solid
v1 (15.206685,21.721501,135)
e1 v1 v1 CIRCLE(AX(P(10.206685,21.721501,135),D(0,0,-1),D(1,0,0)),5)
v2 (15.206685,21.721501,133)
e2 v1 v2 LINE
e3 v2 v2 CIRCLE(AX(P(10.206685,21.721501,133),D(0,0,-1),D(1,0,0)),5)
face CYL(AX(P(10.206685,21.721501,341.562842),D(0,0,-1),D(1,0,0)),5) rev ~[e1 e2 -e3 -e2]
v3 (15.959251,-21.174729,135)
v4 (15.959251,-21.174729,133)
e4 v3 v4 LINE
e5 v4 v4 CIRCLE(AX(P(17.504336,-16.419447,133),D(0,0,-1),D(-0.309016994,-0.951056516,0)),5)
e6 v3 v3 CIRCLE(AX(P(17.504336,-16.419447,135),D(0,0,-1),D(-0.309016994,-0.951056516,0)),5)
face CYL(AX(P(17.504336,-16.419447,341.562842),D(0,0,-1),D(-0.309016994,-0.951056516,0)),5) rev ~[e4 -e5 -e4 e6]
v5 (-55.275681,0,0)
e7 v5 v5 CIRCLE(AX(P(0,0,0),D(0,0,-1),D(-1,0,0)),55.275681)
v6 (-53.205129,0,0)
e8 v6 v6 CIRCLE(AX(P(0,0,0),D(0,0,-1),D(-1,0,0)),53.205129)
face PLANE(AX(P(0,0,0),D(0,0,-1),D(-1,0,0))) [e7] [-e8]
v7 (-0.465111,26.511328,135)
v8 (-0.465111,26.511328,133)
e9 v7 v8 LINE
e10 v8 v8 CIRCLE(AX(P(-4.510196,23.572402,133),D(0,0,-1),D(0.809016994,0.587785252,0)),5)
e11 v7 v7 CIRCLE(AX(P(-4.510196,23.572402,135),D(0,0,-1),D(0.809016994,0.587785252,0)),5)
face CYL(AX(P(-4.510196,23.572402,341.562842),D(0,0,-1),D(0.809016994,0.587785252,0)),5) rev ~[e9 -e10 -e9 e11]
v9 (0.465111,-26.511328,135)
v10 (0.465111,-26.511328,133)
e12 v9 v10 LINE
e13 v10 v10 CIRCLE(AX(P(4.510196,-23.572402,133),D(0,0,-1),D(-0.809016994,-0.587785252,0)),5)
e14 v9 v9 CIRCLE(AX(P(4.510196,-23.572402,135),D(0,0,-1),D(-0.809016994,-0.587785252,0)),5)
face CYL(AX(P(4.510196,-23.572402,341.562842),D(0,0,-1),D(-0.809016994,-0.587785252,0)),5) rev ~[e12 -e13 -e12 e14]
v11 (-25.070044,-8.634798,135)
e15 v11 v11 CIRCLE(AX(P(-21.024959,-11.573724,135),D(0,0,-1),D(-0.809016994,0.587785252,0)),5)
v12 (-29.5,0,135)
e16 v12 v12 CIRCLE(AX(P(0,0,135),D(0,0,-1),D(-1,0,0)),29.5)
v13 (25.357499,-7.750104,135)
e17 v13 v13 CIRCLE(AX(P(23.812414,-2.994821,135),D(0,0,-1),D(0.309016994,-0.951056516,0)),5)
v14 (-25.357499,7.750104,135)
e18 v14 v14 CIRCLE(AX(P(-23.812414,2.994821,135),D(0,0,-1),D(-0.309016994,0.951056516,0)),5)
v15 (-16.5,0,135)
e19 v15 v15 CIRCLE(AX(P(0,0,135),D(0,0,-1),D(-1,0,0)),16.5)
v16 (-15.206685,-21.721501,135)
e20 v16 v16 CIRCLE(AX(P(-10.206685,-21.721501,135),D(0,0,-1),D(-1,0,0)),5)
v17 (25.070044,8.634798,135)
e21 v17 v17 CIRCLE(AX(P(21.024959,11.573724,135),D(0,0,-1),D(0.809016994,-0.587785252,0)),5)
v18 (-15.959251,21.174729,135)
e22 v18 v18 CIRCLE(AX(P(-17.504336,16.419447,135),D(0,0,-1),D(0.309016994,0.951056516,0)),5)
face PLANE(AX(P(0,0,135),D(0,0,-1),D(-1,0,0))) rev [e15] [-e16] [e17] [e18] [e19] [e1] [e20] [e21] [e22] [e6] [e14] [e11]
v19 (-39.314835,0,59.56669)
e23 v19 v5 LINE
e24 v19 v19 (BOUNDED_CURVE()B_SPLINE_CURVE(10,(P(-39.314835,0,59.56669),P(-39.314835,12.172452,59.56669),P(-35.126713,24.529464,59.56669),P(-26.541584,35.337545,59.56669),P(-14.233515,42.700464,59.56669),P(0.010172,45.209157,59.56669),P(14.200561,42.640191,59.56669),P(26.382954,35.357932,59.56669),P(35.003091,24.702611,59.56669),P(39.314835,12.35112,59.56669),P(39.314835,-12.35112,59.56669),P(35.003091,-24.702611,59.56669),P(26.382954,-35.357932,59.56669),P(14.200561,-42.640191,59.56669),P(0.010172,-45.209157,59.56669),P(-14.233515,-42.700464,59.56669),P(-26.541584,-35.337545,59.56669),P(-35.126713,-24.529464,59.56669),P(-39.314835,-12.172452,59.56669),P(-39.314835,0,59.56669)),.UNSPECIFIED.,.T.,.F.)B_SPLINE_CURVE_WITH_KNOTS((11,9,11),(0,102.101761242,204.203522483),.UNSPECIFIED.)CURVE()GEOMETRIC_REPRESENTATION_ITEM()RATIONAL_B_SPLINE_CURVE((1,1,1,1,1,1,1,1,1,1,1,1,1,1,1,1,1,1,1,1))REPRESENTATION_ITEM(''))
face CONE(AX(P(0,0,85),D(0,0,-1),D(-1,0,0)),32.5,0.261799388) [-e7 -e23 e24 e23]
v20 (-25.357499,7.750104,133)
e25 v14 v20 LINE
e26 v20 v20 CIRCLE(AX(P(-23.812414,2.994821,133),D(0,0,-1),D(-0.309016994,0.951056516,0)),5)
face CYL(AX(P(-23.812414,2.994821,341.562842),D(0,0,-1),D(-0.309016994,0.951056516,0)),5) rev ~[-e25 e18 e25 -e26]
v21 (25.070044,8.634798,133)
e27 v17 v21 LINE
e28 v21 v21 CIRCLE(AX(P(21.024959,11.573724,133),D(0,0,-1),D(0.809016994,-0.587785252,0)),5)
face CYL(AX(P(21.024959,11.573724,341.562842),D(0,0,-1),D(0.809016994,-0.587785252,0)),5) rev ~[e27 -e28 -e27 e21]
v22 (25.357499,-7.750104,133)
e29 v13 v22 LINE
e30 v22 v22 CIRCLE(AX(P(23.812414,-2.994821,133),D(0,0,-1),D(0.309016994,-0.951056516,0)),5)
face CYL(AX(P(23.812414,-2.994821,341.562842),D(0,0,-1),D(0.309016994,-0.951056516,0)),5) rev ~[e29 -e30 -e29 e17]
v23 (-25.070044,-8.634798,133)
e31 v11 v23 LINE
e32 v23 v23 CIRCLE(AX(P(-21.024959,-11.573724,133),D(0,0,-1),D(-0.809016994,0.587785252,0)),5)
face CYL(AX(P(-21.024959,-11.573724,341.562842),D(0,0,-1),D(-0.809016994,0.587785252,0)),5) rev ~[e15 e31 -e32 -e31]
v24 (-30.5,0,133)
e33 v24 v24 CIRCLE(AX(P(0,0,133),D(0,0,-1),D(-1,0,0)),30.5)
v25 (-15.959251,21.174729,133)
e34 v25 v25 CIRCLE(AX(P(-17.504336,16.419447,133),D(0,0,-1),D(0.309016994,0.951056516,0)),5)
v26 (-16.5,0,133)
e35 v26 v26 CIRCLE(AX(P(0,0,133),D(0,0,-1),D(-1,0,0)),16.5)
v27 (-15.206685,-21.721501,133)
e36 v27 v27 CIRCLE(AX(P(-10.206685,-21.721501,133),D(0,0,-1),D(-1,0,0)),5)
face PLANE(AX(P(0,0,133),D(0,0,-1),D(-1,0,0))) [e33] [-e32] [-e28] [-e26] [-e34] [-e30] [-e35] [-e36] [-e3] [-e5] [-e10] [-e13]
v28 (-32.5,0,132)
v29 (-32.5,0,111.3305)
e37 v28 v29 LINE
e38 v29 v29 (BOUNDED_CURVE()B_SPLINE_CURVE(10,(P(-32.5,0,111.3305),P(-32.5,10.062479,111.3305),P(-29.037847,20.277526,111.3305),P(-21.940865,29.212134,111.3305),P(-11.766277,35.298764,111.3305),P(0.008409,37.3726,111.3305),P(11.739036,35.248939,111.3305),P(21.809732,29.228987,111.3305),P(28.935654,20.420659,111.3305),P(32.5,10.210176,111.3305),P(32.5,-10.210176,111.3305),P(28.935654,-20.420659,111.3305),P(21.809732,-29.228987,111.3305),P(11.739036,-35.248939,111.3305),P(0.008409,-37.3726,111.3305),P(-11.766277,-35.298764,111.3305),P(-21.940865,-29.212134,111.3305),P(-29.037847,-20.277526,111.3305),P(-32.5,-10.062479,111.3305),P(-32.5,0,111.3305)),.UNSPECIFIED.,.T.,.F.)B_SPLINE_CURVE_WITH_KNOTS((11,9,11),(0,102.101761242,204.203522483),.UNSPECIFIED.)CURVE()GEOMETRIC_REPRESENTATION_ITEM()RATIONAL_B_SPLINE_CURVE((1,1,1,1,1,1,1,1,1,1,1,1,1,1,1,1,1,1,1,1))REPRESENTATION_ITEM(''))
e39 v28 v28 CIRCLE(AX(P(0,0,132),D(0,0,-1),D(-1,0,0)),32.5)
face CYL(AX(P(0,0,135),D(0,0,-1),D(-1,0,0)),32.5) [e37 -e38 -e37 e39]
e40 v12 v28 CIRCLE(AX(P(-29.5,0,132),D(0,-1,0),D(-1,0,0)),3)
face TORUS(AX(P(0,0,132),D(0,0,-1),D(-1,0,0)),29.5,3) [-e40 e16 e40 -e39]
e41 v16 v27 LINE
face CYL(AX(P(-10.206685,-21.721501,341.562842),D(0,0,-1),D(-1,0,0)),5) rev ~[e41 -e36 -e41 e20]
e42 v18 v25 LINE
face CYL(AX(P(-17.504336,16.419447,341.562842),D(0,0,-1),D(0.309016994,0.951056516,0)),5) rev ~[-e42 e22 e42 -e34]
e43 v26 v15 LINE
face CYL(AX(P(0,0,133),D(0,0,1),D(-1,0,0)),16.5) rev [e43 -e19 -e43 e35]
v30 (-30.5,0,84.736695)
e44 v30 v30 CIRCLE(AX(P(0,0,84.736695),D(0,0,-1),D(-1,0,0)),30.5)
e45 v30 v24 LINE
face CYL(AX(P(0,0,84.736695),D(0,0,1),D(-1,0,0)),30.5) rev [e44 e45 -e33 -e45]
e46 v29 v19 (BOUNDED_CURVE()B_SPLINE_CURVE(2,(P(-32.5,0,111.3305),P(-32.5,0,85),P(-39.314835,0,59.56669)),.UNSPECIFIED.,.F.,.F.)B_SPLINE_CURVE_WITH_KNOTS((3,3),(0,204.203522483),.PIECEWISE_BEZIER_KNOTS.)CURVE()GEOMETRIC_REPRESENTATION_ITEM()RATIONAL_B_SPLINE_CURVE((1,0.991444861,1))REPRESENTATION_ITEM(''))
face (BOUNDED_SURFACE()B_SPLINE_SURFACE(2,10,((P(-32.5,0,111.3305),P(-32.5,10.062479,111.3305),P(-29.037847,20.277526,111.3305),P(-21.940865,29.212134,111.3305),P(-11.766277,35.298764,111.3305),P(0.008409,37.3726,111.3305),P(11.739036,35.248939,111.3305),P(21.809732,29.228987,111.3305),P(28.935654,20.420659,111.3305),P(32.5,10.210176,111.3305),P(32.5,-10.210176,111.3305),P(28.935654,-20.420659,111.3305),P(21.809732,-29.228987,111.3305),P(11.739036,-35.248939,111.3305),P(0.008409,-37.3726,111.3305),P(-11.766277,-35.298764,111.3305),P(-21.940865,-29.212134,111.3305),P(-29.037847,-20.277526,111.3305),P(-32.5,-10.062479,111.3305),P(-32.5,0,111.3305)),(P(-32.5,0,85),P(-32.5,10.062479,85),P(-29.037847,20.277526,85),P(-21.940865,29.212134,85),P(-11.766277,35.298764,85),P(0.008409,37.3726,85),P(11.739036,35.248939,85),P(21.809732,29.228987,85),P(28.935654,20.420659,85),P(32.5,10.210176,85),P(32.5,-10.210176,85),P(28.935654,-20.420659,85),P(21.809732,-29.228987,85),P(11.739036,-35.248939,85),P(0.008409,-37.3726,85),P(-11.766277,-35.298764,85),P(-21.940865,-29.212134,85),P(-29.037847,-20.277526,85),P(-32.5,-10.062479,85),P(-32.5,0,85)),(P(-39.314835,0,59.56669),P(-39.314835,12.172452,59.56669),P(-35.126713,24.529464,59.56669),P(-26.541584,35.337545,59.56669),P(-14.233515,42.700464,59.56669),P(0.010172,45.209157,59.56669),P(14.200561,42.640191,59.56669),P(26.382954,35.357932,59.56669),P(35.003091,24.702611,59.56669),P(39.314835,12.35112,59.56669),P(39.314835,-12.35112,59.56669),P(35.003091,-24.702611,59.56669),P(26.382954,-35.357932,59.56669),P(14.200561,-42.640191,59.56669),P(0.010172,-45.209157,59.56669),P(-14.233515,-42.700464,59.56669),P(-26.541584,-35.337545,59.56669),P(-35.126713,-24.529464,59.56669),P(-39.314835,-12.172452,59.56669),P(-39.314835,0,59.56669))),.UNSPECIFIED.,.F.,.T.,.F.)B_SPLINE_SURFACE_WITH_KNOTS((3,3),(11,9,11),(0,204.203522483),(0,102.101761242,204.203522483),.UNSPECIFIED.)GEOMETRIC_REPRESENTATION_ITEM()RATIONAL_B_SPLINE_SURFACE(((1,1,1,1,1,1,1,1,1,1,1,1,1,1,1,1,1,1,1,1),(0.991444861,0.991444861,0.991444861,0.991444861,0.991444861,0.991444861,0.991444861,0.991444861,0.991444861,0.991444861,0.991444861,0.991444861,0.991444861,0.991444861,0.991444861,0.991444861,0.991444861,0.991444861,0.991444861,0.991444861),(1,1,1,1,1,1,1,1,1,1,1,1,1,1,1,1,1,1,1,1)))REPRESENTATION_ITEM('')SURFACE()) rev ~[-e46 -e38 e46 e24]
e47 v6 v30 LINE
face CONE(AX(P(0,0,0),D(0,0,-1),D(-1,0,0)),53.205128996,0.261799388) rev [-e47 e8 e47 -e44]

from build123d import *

# Parameters (mm, degrees)
F2_R            = 3
F3_R            = 200
F5_D            = 10
F5_COPIES_COUNT = 10


# Not quite as in the source:
# - a pattern or mirror of a feature is missing from the dataset's text; its kind, count and spacing are read off the source's solid


with BuildPart() as f1:
    # F0 (on Front) → F1 (revolve)
    with BuildSketch(Plane.XZ):
        Polygon((-16.5, 133), (-16.5, 135), (-32.5, 135), (-32.5, 85), (-55.2756813566, 0), (-53.2051289958, 0), (-30.5, 84.7366950048), (-30.5, 133), align=None)
    revolve(axis=Axis((0, 0, 82.1189115205), (0, 0, -1)))

    # F2
    f2_edges = [f1.edges().sort_by_distance(p)[0] for p in [
        (32.5, 0, 135),
    ]]
    fillet(f2_edges, radius=F2_R)

    # F3
    f3_edges = [f1.edges().sort_by_distance(p)[0] for p in [
        (32.5, 0, 85),
    ]]
    fillet(f3_edges, radius=F3_R)

    # F5 (through all)
    with Locations(Plane.XY.offset(135)):
        with Locations((-10.2066846848, -21.7215005869)):
            f5 = Hole(F5_D / 2)

    # F5_copies: F5 ×10 about axis
    f5_copies_axis = Axis((0, 0, 0), (0, 0, 1))
    for i in range(1, F5_COPIES_COUNT):
        add(f5.rotate(f5_copies_axis, i * 360 / F5_COPIES_COUNT), mode=Mode.SUBTRACT)


solid = f1.part
